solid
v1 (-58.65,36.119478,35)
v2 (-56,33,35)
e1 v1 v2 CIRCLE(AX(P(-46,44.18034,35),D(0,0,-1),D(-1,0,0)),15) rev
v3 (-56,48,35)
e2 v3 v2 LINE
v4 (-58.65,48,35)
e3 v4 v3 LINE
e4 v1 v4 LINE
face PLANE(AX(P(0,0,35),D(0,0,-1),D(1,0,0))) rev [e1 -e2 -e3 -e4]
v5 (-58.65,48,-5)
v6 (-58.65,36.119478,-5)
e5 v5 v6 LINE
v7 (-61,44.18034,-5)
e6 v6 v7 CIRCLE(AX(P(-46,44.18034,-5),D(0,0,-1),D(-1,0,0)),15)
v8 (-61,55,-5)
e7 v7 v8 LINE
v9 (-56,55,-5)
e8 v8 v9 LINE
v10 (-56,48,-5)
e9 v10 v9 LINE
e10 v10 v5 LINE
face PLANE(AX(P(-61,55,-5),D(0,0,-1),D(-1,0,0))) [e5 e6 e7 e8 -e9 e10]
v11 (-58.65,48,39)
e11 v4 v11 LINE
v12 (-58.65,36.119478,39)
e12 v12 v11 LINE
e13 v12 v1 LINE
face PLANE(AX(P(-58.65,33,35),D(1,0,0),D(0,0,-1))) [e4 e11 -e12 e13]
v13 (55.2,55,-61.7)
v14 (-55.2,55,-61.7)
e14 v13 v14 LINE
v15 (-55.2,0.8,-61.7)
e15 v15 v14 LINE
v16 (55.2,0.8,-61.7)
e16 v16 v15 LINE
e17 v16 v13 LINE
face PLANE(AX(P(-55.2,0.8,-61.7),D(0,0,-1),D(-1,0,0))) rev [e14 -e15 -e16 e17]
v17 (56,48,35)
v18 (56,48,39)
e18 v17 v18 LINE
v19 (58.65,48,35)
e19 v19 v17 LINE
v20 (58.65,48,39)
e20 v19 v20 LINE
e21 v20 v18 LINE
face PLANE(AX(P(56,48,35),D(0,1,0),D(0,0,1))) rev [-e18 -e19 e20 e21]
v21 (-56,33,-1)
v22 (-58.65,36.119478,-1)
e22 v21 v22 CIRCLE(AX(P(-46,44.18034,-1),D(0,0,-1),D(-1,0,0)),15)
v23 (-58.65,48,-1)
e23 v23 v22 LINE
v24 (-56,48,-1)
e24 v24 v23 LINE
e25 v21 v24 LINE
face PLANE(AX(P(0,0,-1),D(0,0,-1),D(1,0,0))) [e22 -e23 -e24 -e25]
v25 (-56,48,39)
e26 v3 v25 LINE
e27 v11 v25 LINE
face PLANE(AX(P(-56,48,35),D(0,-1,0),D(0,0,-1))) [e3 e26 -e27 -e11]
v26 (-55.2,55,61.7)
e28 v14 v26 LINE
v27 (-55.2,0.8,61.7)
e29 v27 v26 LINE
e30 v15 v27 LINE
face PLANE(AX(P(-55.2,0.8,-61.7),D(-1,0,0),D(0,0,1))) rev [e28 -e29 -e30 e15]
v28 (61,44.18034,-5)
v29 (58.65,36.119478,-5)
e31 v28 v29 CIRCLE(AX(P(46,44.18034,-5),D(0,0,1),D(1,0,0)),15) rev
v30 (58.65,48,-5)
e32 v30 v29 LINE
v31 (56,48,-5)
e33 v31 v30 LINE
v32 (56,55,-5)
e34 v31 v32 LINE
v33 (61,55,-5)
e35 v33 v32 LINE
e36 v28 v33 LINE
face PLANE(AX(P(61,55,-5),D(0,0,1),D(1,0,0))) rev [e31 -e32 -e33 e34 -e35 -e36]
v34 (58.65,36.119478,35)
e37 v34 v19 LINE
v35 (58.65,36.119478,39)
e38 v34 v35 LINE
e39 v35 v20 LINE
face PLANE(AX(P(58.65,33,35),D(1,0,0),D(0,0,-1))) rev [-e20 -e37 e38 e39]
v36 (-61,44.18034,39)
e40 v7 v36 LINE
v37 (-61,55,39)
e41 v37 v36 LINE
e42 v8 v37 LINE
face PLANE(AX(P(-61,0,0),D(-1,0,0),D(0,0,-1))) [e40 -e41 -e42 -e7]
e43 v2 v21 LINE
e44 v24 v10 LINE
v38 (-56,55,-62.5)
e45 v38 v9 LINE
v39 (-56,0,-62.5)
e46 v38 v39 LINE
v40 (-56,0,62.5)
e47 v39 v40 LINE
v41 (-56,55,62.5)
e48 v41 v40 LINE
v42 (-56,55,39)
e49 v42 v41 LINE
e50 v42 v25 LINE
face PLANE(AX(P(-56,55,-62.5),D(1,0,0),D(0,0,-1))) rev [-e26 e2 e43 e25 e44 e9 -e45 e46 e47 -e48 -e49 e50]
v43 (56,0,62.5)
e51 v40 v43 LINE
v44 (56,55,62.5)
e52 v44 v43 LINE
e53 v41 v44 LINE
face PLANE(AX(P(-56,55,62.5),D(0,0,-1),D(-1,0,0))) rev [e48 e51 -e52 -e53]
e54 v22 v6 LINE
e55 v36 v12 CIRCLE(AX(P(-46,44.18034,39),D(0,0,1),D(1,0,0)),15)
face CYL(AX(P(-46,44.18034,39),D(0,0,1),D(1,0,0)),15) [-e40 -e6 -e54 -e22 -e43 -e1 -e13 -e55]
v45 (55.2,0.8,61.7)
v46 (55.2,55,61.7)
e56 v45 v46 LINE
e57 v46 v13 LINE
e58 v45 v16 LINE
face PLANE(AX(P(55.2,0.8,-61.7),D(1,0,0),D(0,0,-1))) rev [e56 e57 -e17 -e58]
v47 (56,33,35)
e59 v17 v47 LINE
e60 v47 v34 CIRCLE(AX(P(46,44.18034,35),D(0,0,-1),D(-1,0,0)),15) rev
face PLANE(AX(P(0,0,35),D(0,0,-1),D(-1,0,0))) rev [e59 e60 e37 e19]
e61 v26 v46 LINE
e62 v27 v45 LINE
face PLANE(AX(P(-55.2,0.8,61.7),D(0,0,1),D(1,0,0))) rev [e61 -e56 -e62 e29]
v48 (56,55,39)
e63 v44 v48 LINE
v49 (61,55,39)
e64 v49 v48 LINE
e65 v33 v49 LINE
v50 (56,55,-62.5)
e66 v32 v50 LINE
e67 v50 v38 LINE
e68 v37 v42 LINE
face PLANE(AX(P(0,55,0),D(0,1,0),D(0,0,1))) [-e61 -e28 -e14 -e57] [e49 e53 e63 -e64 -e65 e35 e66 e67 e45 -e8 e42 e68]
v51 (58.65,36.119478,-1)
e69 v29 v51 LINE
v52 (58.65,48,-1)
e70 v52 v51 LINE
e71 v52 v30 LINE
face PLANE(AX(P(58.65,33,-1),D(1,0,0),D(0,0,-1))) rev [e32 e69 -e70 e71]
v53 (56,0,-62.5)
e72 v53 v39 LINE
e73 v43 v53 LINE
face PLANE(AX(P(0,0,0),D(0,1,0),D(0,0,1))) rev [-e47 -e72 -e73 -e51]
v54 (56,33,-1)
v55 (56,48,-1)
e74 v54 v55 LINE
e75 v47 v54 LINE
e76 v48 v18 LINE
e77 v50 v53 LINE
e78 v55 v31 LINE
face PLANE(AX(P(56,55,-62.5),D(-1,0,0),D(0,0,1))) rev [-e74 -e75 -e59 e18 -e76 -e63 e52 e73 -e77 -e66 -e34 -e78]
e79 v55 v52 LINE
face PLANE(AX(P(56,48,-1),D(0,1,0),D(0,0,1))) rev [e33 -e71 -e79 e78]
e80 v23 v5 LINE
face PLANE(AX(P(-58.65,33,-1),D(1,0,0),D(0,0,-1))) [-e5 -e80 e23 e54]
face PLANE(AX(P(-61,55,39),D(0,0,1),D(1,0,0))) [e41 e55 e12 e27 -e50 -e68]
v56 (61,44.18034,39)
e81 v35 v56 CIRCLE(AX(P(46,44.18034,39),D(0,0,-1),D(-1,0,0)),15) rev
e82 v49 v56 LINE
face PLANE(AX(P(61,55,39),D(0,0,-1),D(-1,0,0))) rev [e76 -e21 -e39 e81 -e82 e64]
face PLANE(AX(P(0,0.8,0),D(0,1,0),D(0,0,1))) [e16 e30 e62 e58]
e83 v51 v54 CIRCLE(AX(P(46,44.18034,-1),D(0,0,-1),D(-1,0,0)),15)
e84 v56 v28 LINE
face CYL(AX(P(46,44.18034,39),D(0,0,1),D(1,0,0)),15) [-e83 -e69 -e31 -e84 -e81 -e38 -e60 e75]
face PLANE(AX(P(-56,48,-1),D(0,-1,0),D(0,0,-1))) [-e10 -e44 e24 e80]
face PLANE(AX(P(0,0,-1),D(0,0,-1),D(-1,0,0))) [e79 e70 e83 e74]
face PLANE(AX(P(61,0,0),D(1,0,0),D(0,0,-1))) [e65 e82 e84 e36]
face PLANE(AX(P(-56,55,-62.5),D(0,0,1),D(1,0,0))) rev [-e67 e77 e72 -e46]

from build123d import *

# Parameters (mm, degrees)
SKETCH1_W           = 112
SKETCH1_H           = 125
BOSS_EXTRUDE1_DEPTH = 55
SKETCH2_W           = 110.4
SKETCH2_H           = 123.4
CUT_EXTRUDE1_DEPTH  = 54.2
SKETCH3_W           = 44
SKETCH3_H           = 22
BOSS_EXTRUDE2_DEPTH = 5
SKETCH4_W           = 2.65
SKETCH4_H           = 15
CUT_EXTRUDE2_DEPTH  = 4
SKETCH6_W           = 2.65
SKETCH6_H           = 15
CUT_EXTRUDE3_DEPTH  = 4
FILLET1_R           = 15
FILLET2_R           = 15


with BuildPart() as part:
    # Sketch1 → Boss-Extrude1 (new body)
    with BuildSketch(Plane(origin=(0, 0, 0), x_dir=(1, 0, 0), z_dir=(0, 1, 0))):
        Rectangle(SKETCH1_W, SKETCH1_H)
    extrude(amount=BOSS_EXTRUDE1_DEPTH)

    # Sketch2 → Cut-Extrude1 (cut)
    with BuildSketch(Plane(origin=(0, 55, 0), x_dir=(1, 0, 0), z_dir=(0, 1, 0))):
        Rectangle(SKETCH2_W, SKETCH2_H)
    extrude(amount=-CUT_EXTRUDE1_DEPTH, mode=Mode.SUBTRACT)

    # Sketch3 → Boss-Extrude2 (add)
    with BuildSketch(Plane(origin=(56, 0, 0), x_dir=(0, 0, -1), z_dir=(1, 0, 0))):
        with Locations((-17, 44)):
            Rectangle(SKETCH3_W, SKETCH3_H)
    boss_extrude2 = extrude(amount=BOSS_EXTRUDE2_DEPTH)

    # Sketch4 → Cut-Extrude2 (cut)
    with BuildSketch(Plane.XY.offset(39)):
        with Locations((57.325, 40.5)):
            Rectangle(SKETCH4_W, SKETCH4_H)
    cut_extrude2 = extrude(amount=-CUT_EXTRUDE2_DEPTH, mode=Mode.SUBTRACT)

    # Sketch6 → Cut-Extrude3 (cut)
    with BuildSketch(Plane(origin=(0, 0, -5), x_dir=(-1, 0, 0), z_dir=(0, 0, -1))):
        with Locations((-57.325, 40.5)):
            Rectangle(SKETCH6_W, SKETCH6_H)
    cut_extrude3 = extrude(amount=-CUT_EXTRUDE3_DEPTH, mode=Mode.SUBTRACT)

    # Mirror5: Boss-Extrude2 across plane
    add(boss_extrude2.mirror(Plane(origin=(0, 0, 0), x_dir=(0, 0, 1), z_dir=(1, 0, 0))))

    # Mirror6: Cut-Extrude2 across plane
    add(cut_extrude2.mirror(Plane(origin=(0, 0, 0), x_dir=(0, 0, 1), z_dir=(1, 0, 0))), mode=Mode.SUBTRACT)

    # Mirror7: Cut-Extrude3 across plane
    add(cut_extrude3.mirror(Plane(origin=(0, 0, 0), x_dir=(0, 0, 1), z_dir=(1, 0, 0))), mode=Mode.SUBTRACT)

    # Fillet1
    # the kernel refuses this fillet: 15 mm, written as the material it takes off along each edge
    with BuildSketch(Plane(origin=(61, 33, -32.950849719), x_dir=(-1, 0, 0), z_dir=(0, 0, 1))) as fillet1_piece_1:
        with BuildLine():
            CenterArc((15, -11.180339887), FILLET1_R, 131.810314896, 48.189685104)
            Line((0, -11.180339887), (-0.3, -11.180339887))
            Line((-0.3, -11.180339887), (-0.3, 0))
            Line((-0.3, 0), (0, 0.3))
            ThreePointArc((0, 0.3), (2.5, 0.3), (4.8, 0.223606798))
            Line((4.8, 0.223606798), (5, 0))
        make_face()
    extrude(amount=99.901699437, mode=Mode.SUBTRACT)

    # Fillet2
    # the kernel refuses this fillet: 15 mm, written as the material it takes off along each edge
    with BuildSketch(Plane(origin=(-61, 33, -32.950849719), x_dir=(1, 0, 0), z_dir=(0, 0, 1))) as fillet2_piece_1:
        with BuildLine():
            CenterArc((15, 11.180339887), FILLET2_R, 180, 48.189685104)
            Line((0, 11.180339887), (-0.3, 11.180339887))
            Line((-0.3, 11.180339887), (-0.3, 0))
            Line((-0.3, 0), (0, -0.3))
            ThreePointArc((0, -0.3), (2.5, -0.3), (4.8, -0.223606798))
            Line((4.8, -0.223606798), (5, 0))
        make_face()
    extrude(amount=99.901699437, mode=Mode.SUBTRACT)


solid = part.part
